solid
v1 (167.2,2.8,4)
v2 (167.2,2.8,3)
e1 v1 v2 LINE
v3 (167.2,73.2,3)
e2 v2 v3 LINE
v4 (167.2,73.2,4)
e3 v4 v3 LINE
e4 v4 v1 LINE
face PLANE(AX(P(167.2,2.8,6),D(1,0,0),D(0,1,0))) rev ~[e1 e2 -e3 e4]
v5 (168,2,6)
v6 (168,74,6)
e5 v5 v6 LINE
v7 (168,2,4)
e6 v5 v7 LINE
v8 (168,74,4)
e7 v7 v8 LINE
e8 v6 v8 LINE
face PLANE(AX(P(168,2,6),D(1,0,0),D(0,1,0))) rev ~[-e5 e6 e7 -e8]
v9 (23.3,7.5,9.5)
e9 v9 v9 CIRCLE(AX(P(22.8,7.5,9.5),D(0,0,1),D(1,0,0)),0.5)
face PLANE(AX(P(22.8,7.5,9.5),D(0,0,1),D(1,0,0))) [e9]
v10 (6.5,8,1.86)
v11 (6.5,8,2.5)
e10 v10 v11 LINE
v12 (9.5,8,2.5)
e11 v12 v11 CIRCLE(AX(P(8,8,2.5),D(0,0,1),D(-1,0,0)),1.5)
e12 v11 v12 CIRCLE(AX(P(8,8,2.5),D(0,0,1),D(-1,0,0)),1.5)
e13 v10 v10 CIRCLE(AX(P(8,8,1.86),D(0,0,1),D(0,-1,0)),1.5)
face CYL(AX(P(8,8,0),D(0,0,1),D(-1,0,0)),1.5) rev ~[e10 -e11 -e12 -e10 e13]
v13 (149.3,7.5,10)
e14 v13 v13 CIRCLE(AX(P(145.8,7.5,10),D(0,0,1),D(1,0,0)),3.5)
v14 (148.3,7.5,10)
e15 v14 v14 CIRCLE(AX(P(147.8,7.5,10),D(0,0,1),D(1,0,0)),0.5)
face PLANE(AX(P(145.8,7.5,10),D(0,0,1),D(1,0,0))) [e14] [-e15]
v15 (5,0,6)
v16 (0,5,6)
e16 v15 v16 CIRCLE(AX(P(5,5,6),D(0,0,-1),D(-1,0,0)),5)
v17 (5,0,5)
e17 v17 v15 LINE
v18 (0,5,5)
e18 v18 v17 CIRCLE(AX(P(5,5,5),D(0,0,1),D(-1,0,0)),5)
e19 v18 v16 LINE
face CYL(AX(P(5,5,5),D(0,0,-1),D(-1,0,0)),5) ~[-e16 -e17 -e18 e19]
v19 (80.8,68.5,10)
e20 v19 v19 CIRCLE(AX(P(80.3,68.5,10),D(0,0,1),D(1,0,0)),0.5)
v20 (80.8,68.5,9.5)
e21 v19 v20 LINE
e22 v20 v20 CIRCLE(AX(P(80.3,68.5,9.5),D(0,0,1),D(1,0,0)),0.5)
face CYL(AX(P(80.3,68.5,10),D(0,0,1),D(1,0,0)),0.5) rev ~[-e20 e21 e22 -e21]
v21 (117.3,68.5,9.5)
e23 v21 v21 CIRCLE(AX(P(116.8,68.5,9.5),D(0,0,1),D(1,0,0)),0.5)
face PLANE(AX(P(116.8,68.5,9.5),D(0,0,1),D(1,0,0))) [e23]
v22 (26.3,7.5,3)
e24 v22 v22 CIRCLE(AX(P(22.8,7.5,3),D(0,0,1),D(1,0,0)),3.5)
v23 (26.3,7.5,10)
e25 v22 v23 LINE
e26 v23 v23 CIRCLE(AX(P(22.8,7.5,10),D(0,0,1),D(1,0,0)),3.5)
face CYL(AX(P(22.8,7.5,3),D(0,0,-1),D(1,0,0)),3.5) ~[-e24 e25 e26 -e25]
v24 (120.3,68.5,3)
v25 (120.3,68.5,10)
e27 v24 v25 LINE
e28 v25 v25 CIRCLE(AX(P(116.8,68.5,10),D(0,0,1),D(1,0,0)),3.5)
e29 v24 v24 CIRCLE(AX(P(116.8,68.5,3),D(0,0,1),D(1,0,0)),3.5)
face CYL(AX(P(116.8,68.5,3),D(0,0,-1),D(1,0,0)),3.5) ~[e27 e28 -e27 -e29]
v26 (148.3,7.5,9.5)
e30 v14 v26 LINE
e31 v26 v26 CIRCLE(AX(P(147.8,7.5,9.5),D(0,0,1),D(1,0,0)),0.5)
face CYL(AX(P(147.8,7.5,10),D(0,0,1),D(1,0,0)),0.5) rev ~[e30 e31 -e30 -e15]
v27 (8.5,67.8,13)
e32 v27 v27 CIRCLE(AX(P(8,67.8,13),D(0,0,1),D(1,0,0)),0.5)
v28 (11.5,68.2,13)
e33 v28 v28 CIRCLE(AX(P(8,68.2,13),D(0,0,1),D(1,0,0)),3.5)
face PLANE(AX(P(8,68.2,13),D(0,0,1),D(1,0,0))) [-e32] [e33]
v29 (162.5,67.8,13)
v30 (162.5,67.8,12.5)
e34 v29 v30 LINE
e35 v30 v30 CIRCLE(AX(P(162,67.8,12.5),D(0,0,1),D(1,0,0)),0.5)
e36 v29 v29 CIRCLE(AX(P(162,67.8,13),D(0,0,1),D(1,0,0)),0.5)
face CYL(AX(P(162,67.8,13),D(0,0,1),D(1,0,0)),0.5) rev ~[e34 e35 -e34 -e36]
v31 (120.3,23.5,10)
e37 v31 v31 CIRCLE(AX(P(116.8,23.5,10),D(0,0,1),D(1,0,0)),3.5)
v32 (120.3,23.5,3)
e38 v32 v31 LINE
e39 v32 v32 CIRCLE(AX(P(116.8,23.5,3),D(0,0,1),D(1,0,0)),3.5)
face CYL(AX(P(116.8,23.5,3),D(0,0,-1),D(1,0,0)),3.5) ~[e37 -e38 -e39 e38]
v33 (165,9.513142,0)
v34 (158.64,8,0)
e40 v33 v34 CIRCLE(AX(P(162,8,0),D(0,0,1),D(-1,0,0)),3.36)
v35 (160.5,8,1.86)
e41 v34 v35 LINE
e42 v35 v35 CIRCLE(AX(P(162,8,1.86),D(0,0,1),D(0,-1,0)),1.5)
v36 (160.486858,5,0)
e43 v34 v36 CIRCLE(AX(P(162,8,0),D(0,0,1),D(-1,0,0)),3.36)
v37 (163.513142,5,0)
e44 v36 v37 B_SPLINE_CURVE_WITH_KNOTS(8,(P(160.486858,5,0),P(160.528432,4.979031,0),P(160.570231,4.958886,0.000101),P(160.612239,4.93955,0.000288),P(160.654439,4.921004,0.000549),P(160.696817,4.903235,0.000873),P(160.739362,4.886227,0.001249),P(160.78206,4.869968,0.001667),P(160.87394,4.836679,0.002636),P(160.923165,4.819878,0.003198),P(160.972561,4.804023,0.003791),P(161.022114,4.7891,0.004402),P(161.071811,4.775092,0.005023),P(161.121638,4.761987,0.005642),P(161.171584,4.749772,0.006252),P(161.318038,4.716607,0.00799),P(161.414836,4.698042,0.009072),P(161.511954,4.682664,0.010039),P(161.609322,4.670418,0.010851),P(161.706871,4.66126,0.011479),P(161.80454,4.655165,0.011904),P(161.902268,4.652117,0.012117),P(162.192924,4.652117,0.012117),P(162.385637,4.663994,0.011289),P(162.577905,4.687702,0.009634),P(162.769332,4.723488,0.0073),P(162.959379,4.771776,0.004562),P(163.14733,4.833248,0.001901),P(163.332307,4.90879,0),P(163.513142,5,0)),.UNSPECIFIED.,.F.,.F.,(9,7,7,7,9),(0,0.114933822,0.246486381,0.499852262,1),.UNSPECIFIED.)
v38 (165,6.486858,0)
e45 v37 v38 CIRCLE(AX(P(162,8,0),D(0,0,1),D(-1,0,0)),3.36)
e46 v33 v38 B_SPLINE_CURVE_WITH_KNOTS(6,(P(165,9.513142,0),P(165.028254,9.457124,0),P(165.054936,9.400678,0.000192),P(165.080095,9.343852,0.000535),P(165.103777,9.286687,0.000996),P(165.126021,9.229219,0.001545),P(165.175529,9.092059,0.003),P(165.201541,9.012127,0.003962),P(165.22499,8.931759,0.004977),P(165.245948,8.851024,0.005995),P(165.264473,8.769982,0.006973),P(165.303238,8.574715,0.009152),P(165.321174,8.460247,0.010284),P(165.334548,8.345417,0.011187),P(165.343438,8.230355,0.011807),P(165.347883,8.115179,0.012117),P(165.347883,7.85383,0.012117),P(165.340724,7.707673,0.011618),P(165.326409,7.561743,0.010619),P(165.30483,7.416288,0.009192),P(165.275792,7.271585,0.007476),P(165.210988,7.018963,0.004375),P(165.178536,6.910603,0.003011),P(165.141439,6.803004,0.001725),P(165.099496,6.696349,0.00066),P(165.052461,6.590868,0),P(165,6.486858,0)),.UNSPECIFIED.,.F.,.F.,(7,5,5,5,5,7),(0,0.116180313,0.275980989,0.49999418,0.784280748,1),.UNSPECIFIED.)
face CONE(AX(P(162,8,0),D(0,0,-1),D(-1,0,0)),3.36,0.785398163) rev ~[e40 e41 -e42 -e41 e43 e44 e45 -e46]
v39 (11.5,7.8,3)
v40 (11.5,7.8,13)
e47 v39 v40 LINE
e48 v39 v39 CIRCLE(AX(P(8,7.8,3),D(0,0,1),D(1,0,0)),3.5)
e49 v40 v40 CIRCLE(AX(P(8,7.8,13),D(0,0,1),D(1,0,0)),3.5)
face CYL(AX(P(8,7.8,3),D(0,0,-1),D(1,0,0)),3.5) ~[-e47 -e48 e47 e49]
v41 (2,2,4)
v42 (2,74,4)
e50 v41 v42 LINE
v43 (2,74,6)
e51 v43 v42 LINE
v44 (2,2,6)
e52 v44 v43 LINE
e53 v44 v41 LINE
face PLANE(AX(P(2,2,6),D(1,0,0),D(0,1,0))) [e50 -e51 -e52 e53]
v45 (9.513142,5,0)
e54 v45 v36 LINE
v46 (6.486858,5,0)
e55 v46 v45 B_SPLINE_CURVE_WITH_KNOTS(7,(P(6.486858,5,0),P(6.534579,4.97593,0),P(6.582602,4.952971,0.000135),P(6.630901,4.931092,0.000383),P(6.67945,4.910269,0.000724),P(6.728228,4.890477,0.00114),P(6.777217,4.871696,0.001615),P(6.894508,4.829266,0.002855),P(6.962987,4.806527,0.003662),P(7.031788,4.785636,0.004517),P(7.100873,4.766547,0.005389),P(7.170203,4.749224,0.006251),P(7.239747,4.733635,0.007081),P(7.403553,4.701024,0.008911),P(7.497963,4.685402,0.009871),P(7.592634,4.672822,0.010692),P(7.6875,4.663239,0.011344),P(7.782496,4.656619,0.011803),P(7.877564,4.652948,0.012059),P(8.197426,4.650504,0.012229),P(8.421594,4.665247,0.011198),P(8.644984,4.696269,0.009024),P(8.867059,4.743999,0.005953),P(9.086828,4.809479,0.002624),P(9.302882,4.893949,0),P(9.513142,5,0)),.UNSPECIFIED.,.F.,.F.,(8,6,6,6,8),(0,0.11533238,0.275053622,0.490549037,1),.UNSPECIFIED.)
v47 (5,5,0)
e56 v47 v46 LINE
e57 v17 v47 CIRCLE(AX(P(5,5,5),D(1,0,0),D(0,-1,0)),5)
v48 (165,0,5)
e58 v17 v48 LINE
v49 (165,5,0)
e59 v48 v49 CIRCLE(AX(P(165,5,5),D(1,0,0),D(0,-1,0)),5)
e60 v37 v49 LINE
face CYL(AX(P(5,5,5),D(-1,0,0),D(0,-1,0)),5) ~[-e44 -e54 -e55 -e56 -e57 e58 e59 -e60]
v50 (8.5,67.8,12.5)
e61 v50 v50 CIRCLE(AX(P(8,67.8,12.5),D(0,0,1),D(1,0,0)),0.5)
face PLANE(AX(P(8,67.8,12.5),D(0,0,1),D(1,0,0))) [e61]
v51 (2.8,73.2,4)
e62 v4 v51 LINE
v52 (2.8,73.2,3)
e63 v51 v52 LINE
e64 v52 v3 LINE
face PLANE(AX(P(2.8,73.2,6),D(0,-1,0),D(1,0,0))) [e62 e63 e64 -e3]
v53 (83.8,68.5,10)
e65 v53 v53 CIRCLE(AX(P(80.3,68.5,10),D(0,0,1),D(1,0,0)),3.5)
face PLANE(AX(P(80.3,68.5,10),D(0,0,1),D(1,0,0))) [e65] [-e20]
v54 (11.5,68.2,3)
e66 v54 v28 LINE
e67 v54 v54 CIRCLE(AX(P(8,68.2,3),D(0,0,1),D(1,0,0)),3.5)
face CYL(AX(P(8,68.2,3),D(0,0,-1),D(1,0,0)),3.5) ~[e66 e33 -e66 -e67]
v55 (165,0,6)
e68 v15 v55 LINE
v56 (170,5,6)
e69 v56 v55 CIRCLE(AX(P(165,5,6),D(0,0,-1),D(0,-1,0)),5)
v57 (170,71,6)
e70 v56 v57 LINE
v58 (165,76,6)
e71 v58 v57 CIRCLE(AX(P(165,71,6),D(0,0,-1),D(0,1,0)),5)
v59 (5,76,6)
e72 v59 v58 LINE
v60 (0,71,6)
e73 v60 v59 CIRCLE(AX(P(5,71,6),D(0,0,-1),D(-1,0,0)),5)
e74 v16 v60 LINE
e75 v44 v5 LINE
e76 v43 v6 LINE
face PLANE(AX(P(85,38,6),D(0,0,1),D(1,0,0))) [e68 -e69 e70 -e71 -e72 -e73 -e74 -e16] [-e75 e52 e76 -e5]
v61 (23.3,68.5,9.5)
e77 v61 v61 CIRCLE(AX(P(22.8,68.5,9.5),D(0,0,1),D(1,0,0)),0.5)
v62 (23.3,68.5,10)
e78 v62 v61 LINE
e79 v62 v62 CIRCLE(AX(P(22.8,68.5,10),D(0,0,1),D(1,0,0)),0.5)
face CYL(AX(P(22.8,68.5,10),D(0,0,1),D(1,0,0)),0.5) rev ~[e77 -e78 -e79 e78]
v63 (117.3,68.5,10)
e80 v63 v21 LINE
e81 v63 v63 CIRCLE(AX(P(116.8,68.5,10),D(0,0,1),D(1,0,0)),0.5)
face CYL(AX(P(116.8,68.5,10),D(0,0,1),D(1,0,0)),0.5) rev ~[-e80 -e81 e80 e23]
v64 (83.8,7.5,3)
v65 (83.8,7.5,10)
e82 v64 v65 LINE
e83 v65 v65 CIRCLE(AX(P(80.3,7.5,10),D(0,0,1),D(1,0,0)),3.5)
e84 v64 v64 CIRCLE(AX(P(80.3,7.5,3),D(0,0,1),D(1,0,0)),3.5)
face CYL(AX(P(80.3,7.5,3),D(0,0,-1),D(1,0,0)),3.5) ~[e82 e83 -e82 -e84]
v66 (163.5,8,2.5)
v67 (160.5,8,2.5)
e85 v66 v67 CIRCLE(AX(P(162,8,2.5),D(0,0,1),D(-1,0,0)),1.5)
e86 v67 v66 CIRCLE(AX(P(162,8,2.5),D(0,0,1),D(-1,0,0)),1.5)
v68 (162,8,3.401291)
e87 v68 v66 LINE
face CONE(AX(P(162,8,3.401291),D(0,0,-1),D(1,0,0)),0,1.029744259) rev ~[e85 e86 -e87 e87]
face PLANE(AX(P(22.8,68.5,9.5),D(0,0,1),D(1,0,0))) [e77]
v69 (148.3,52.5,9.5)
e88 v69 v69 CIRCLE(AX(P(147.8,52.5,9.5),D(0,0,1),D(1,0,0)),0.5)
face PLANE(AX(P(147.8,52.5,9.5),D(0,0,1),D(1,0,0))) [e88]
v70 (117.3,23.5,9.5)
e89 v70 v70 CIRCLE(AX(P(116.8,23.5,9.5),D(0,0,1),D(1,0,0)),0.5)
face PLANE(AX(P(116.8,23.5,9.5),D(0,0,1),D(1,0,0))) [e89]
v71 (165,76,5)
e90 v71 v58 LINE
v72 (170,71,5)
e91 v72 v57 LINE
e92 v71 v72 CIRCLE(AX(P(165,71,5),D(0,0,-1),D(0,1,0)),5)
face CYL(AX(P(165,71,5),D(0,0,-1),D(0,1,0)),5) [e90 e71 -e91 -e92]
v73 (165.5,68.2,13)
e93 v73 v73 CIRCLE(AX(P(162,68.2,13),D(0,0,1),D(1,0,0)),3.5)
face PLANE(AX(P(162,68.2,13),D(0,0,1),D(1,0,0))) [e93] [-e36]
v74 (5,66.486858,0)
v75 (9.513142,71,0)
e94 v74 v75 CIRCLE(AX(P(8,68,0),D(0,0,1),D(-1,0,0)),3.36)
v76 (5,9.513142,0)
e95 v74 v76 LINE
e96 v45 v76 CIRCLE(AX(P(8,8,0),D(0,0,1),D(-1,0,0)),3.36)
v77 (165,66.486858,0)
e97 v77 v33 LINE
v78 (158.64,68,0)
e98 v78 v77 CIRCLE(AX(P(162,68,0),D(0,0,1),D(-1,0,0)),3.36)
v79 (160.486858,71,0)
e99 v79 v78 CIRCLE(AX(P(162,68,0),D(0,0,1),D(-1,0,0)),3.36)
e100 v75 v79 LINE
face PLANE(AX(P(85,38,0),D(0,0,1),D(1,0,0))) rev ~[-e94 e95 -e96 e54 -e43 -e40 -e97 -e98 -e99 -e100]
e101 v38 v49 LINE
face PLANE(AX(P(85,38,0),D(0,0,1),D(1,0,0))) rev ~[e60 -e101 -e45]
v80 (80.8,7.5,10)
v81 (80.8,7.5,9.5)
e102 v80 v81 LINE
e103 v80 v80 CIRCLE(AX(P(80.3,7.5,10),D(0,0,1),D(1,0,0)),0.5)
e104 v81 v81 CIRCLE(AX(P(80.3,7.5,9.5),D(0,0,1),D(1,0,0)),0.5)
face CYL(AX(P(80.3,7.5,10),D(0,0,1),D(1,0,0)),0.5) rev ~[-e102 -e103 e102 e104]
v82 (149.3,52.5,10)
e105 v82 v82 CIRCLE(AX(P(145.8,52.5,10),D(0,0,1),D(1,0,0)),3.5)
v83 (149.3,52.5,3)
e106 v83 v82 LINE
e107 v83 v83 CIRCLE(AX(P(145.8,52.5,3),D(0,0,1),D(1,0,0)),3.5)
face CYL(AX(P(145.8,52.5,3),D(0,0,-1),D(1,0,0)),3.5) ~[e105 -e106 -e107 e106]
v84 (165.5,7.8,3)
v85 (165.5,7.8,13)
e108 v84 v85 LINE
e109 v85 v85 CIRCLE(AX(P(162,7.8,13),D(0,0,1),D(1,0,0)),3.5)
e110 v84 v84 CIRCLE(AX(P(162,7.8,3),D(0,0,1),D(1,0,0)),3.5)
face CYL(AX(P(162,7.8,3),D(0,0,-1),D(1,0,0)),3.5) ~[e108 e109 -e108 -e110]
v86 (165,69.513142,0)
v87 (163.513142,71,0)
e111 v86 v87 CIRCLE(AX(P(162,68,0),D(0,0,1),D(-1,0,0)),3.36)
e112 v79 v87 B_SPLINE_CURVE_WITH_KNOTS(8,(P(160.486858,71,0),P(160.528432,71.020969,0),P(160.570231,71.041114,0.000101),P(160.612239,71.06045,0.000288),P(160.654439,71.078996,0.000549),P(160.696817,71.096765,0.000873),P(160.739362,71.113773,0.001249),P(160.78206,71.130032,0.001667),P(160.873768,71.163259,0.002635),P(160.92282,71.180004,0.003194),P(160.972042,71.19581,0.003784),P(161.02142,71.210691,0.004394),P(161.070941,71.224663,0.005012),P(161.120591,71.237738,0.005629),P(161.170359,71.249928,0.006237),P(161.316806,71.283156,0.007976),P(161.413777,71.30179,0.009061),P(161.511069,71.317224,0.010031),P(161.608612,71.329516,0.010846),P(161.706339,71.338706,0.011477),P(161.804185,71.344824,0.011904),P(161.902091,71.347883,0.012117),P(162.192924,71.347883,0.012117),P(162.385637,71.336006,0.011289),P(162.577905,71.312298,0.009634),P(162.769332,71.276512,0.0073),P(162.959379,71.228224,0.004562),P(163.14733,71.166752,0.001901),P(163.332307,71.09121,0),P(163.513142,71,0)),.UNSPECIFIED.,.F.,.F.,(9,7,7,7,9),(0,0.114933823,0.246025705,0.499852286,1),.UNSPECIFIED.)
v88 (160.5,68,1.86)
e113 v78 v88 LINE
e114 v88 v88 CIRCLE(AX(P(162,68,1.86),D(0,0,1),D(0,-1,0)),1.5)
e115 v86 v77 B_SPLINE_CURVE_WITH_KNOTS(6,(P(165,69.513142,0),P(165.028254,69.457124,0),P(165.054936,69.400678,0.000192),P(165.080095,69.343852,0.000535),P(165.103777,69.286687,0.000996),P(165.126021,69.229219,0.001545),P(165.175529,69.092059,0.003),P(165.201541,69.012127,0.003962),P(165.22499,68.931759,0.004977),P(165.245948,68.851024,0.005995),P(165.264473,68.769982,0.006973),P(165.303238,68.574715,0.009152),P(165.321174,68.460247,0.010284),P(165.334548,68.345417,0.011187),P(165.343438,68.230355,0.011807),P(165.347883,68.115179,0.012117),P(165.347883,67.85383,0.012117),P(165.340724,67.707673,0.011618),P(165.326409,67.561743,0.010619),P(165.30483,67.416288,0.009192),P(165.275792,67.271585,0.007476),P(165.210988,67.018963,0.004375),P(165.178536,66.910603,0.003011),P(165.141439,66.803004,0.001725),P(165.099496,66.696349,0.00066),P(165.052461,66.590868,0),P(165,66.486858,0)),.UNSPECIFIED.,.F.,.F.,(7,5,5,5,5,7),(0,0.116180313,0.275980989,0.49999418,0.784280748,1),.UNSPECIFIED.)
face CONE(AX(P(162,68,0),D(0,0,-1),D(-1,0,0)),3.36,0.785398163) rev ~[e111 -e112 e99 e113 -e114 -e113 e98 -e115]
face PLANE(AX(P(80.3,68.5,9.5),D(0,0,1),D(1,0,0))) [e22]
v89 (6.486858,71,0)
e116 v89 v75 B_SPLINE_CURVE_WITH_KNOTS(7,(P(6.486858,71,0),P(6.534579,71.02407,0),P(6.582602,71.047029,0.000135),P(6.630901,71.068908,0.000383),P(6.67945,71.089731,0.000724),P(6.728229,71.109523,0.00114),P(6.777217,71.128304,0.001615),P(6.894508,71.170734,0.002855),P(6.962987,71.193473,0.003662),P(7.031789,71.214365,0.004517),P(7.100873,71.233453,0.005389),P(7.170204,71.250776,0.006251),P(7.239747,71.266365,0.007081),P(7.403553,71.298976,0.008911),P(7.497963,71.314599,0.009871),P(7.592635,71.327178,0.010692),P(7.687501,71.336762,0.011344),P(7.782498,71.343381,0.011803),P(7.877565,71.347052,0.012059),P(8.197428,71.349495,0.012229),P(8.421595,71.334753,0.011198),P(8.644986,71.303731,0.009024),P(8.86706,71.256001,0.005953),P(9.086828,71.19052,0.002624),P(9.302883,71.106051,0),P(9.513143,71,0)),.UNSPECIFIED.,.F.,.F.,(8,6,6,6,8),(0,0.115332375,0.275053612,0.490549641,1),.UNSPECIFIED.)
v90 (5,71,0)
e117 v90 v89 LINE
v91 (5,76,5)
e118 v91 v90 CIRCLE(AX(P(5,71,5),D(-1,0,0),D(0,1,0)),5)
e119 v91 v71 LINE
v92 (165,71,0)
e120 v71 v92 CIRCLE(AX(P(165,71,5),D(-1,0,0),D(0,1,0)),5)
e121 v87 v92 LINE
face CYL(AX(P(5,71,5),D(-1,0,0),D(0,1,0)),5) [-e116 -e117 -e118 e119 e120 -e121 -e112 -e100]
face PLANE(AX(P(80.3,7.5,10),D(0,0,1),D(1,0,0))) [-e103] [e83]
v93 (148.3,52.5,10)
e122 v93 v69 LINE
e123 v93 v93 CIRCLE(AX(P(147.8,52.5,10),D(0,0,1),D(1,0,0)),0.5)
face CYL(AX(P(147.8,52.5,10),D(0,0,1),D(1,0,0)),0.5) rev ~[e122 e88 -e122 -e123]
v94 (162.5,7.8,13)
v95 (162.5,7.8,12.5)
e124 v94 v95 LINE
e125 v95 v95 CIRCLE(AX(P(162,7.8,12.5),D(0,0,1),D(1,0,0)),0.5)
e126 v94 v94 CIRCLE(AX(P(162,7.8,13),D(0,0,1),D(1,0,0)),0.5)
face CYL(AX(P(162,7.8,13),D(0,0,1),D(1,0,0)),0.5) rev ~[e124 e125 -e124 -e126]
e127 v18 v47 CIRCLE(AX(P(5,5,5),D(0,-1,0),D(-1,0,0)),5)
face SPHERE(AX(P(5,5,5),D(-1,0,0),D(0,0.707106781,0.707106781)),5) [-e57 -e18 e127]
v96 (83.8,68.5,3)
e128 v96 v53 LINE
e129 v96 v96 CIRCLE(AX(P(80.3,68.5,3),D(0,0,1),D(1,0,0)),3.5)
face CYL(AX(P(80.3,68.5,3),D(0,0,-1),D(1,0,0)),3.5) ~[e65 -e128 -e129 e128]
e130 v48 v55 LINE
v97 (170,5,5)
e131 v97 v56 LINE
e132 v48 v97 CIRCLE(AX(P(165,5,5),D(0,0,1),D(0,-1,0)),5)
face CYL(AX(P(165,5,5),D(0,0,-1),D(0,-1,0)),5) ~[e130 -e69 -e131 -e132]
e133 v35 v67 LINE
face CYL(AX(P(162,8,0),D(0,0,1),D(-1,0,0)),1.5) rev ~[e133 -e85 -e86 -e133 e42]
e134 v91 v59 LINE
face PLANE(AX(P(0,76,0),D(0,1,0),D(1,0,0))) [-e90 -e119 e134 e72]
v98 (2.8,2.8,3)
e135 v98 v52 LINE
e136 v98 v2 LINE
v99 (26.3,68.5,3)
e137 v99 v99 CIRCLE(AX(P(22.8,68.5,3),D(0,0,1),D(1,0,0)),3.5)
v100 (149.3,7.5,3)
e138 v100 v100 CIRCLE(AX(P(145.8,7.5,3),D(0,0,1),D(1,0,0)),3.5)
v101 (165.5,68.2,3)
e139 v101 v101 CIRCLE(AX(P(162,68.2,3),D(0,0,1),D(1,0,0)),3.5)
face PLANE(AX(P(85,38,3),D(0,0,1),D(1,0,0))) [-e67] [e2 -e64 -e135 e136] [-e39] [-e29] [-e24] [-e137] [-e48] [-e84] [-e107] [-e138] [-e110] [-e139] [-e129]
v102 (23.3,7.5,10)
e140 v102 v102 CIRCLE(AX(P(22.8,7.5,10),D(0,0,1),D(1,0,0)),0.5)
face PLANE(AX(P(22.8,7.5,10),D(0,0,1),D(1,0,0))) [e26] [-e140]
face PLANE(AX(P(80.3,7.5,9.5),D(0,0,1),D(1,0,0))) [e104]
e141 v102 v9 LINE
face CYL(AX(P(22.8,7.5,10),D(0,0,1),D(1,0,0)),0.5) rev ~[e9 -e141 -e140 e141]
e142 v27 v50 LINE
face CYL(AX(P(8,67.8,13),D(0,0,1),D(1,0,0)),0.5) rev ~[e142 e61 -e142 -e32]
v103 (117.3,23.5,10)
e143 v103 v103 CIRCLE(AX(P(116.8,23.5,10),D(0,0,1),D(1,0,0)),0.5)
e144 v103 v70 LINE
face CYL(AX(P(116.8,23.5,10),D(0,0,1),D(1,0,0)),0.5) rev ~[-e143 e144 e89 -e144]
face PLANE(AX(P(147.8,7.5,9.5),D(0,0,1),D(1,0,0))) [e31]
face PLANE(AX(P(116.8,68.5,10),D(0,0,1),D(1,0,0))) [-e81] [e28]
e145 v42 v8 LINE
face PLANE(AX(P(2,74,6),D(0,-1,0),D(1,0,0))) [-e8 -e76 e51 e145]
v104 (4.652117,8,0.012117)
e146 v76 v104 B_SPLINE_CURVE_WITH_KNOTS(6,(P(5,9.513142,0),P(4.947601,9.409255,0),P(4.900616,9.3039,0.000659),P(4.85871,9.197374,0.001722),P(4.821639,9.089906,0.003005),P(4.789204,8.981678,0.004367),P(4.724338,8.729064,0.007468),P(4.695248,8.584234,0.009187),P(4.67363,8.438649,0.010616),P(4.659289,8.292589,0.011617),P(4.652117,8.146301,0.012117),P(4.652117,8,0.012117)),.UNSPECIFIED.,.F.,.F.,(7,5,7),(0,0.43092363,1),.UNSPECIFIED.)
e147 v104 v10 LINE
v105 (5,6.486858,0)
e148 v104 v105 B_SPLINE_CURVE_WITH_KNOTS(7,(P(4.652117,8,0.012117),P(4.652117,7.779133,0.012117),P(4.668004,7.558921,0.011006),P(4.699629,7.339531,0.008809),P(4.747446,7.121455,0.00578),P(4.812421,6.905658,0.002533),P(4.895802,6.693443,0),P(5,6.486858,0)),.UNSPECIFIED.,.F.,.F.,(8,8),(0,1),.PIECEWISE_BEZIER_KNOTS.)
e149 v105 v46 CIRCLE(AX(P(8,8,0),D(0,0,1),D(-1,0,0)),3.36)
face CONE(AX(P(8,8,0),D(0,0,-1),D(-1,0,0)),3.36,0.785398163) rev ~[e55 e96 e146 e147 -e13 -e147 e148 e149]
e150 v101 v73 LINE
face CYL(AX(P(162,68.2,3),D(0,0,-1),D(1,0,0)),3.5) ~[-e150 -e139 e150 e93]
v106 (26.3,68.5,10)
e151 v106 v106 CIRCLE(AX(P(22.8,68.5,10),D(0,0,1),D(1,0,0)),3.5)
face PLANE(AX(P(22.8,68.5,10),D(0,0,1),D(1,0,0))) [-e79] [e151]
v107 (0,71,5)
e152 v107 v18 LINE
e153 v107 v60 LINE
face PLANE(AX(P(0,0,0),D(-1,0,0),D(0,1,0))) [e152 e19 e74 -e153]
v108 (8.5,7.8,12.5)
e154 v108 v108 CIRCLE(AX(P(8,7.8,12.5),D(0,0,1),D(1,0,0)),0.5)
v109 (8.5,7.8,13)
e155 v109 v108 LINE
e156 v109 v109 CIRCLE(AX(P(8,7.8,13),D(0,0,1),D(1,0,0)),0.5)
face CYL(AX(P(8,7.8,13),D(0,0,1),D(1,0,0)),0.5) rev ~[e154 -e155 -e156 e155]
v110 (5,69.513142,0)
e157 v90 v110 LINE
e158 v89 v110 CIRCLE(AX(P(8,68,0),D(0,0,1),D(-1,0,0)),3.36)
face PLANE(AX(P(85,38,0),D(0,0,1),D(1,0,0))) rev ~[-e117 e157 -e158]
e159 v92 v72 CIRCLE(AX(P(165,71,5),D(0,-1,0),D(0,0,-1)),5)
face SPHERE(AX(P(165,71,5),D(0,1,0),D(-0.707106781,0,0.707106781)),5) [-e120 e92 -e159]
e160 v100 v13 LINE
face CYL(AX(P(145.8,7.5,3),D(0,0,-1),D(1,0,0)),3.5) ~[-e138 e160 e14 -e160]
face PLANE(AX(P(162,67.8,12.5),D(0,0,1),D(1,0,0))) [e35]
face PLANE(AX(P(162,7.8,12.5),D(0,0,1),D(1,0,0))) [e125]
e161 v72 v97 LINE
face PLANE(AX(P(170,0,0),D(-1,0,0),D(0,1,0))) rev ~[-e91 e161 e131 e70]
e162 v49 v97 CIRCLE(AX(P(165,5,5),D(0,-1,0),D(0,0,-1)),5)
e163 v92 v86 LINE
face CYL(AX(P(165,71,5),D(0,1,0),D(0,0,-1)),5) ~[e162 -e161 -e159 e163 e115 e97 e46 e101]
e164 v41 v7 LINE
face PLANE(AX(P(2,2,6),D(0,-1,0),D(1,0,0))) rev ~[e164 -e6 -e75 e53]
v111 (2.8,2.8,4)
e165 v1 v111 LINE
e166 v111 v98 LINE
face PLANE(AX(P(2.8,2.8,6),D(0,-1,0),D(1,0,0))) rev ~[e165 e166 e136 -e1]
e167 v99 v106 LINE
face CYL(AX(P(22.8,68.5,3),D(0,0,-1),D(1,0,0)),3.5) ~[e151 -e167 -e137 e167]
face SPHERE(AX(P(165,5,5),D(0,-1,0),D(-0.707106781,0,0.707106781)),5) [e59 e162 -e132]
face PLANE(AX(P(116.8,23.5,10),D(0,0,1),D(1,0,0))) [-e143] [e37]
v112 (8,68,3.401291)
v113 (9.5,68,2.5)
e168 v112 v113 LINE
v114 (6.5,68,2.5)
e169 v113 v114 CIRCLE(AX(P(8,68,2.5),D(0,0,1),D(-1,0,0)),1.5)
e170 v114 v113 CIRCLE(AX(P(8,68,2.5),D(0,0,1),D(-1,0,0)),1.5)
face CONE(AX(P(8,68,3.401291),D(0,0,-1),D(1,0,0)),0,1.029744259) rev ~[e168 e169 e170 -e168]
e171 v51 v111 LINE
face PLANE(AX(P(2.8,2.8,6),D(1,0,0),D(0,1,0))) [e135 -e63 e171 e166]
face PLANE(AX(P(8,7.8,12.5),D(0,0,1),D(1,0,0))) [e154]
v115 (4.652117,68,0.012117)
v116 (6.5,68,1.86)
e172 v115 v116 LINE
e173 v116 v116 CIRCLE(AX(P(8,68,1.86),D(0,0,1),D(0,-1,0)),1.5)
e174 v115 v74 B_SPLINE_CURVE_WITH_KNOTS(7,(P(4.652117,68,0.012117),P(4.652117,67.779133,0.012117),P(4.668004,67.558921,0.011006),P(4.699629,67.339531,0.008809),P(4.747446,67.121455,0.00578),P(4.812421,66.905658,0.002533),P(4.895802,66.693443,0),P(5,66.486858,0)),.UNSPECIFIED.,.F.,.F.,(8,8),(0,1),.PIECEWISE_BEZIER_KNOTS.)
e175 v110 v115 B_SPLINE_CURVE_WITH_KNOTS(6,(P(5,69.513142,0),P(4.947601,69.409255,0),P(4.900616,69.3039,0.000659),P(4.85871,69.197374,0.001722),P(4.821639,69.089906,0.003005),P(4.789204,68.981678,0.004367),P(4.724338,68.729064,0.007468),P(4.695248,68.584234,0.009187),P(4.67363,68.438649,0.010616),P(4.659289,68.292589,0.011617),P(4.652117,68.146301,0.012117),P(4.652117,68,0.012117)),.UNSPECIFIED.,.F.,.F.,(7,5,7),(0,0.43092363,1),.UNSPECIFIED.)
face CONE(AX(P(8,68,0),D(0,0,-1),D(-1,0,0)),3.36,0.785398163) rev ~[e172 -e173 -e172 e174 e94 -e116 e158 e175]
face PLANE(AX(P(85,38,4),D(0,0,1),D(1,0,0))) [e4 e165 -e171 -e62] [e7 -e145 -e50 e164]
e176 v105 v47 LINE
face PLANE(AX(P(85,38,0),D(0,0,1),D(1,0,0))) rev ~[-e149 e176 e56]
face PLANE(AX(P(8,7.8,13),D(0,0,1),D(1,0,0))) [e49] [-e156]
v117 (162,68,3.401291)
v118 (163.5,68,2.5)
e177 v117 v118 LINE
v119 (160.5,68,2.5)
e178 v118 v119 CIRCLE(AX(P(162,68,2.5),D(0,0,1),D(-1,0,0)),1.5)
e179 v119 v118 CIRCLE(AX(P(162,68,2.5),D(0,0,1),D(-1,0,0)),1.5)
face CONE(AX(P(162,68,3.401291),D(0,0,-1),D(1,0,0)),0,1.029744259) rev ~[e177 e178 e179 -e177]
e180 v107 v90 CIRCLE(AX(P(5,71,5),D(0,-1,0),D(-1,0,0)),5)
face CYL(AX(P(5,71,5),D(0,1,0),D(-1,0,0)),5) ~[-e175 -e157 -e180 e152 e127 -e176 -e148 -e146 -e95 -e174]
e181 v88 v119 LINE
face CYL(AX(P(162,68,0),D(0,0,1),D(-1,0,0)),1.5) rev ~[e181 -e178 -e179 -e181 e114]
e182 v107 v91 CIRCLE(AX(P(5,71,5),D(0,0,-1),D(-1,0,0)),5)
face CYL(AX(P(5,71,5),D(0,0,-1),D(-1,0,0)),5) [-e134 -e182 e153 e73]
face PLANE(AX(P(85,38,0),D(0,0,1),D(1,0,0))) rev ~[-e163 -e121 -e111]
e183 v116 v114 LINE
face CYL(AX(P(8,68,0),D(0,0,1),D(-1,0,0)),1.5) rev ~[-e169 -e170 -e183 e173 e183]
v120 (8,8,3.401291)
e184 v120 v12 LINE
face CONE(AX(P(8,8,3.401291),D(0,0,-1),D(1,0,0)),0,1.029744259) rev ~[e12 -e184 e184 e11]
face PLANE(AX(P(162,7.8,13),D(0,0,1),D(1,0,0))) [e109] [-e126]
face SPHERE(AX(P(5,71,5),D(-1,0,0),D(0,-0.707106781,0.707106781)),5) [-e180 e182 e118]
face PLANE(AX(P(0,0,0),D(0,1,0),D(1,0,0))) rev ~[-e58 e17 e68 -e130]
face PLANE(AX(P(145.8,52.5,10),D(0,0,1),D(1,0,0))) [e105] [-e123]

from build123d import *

# Parameters (mm, degrees)
F0_W            = 170
F0_H            = 76
F1_DEPTH        = 6
F2_W            = 164.4
F2_H            = 70.4
F3_DEPTH        = 3
F4_R            = 3.5
F5_DEPTH        = 7
F6_R            = 4
F7_DEPTH        = 2.8
F8_W            = 166
F8_H            = 72
F8_W_2          = 163.2
F8_H_2          = 69.2
F9_DEPTH        = 2
F10_R           = 3.5
F11_DEPTH       = 10
F12_R           = 0.5
F13_DEPTH       = 0.5
F14_R           = 0.5
F15_DEPTH       = 0.5
F17_D           = 3
F17_DEPTH       = 2.5
F17_CSINK_D     = 6.72
F17_CSINK_ANGLE = 90
F17_TIP         = 0.9012909285
F18_T1_DEPTH    = 13.5
F18_T3_DEPTH    = 66
F18_T5_DEPTH    = 160
F18_S9_W        = 5
F18_S9_H        = 5
F18_T10_DEPTH   = 5
F18_S15_W       = 5
F18_S15_H       = 5
F18_T16_DEPTH   = 5
F18_S21_W       = 5
F18_S21_H       = 5
F18_T22_DEPTH   = 5
F18_S27_W       = 5
F18_S27_H       = 5
F18_T28_DEPTH   = 5


# Not quite as in the source:
# - a fillet or chamfer that OpenCascade refuses, or shapes differently, is made with other operations: its cross-section is extruded or revolved along the edge and cut away or added


with BuildPart() as f1:
    # F0 (on Top) → F1 (new body)
    with BuildSketch(Plane.XY):
        with Locations((85, 38)):
            Rectangle(F0_W, F0_H)
    extrude(amount=F1_DEPTH)

    # F2 (on face) → F3 (cut)
    with BuildSketch(Plane.XY.offset(6)):
        with Locations((85, 38)):
            Rectangle(F2_W, F2_H)
    extrude(amount=-F3_DEPTH, mode=Mode.SUBTRACT)

    # F4 (on face) → F5 (join)
    with BuildSketch(Plane.XY.offset(3)):
        with Locations((22.8, 68.5)):
            Circle(F4_R)
        with Locations((22.8, 7.5)):
            Circle(F4_R)
        with Locations((80.3, 68.5)):
            Circle(F4_R)
        with Locations((80.3, 7.5)):
            Circle(F4_R)
        with Locations((116.8, 68.5)):
            Circle(F4_R)
        with Locations((145.8, 52.5)):
            Circle(F4_R)
        with Locations((116.8, 23.5)):
            Circle(F4_R)
        with Locations((145.8, 7.5)):
            Circle(F4_R)
    extrude(amount=F5_DEPTH)

    # F6 (on face) → F7 (cut, through all)
    with BuildSketch(Plane(origin=(0, 0, 0), x_dir=(0, -1, 0), z_dir=(-1, 0, 0))):
        with Locations((-57, 18)):
            Circle(F6_R)
        with Locations((-19, 18)):
            Circle(F6_R)
    extrude(amount=-F7_DEPTH, mode=Mode.SUBTRACT)

    # F8 (on face) → F9 (cut)
    with BuildSketch(Plane.XY.offset(6)):
        with Locations((85, 38)):
            Rectangle(F8_W, F8_H)
        with Locations((84.6, 37.6)):
            Rectangle(F8_W_2, F8_H_2, mode=Mode.SUBTRACT)
    extrude(amount=-F9_DEPTH, mode=Mode.SUBTRACT)

    # F10 (on face) → F11 (join)
    with BuildSketch(Plane.XY.offset(3)):
        with Locations((8, 68.2)):
            Circle(F10_R)
        with Locations((8, 7.8)):
            Circle(F10_R)
        with Locations((162, 7.8)):
            Circle(F10_R)
        with Locations((162, 68.2)):
            Circle(F10_R)
    extrude(amount=F11_DEPTH)

    # F12 (on face) → F13 (cut)
    with BuildSketch(Plane.XY.offset(13)):
        with Locations((8, 67.8)):
            Circle(F12_R)
        with Locations((8, 7.8)):
            Circle(F12_R)
        with Locations((162, 7.8)):
            Circle(F12_R)
        with Locations((162, 67.8)):
            Circle(F12_R)
    extrude(amount=-F13_DEPTH, mode=Mode.SUBTRACT)

    # F14 (on face) → F15 (cut)
    with BuildSketch(Plane.XY.offset(10)):
        with Locations((22.8, 68.5)):
            Circle(F14_R)
        with Locations((22.8, 7.5)):
            Circle(F14_R)
        with Locations((80.3, 68.5)):
            Circle(F14_R)
        with Locations((80.3, 7.5)):
            Circle(F14_R)
        with Locations((116.8, 68.5)):
            Circle(F14_R)
        with Locations((147.8, 52.5)):
            Circle(F14_R)
        with Locations((116.8, 23.5)):
            Circle(F14_R)
        with Locations((147.8, 7.5)):
            Circle(F14_R)
    extrude(amount=-F15_DEPTH, mode=Mode.SUBTRACT)

    # F17
    with Locations(Plane(origin=(0, 0, 0), x_dir=(1, 0, 0), z_dir=(0, 0, -1))):
        with Locations((8, -8), (8, -68), (162, -68), (162, -8)):
            CounterSinkHole(F17_D / 2, F17_CSINK_D / 2, depth=F17_DEPTH, counter_sink_angle=F17_CSINK_ANGLE)
            with Locations((0, 0, -(F17_DEPTH + F17_TIP / 2))):  # 118° drill point
                Cone(0, F17_D / 2, F17_TIP, mode=Mode.SUBTRACT)

    # F18: fillet of radius 5 on 8 edges, made by hand

    # F18_s2 → F18_t1 (cut)
    with BuildSketch(Plane.XY.offset(5)):
        with BuildLine():
            ThreePointArc((165, 76), (168.5355339059, 74.5355339059), (170, 71))
            Line((170, 71), (170, 76))
            Line((170, 76), (165, 76))
        make_face()
        with BuildLine():
            ThreePointArc((165, 0), (168.5355339059, 1.4644660941), (170, 5))
            Line((170, 5), (170, 0))
            Line((170, 0), (165, 0))
        make_face()
        with BuildLine():
            ThreePointArc((0, 71), (1.4644660941, 74.5355339059), (5, 76))
            Line((5, 76), (0, 76))
            Line((0, 76), (0, 71))
        make_face()
        with BuildLine():
            ThreePointArc((0, 5), (1.4644660941, 1.4644660941), (5, 0))
            Line((5, 0), (0, 0))
            Line((0, 0), (0, 5))
        make_face()
    extrude(amount=F18_T1_DEPTH, mode=Mode.SUBTRACT)

    # F18_s4 → F18_t3 (cut)
    with BuildSketch(Plane.XZ.offset(-71)):
        with BuildLine():
            ThreePointArc((165, 0), (168.5355339059, 1.4644660941), (170, 5))
            Line((170, 5), (170, 0))
            Line((170, 0), (165, 0))
        make_face()
        with BuildLine():
            ThreePointArc((0, 5), (1.4644660941, 1.4644660941), (5, 0))
            Line((5, 0), (0, 0))
            Line((0, 0), (0, 5))
        make_face()
    extrude(amount=F18_T3_DEPTH, mode=Mode.SUBTRACT)

    # F18_s6 → F18_t5 (cut)
    with BuildSketch(Plane.YZ.offset(5)):
        with BuildLine():
            ThreePointArc((76, 5), (74.5355339059, 1.4644660941), (71, 0))
            Line((71, 0), (76, 0))
            Line((76, 0), (76, 5))
        make_face()
        with BuildLine():
            ThreePointArc((0, 5), (1.4644660941, 1.4644660941), (5, 0))
            Line((5, 0), (0, 0))
            Line((0, 0), (0, 5))
        make_face()
    extrude(amount=F18_T5_DEPTH, mode=Mode.SUBTRACT)


with BuildPart() as f18_tool8:
    # F18_s9 → F18_t10 (new body)
    with BuildSketch(Plane.XZ.offset(-71)):
        with Locations((167.5, 2.5)):
            Rectangle(F18_S9_W, F18_S9_H)
    extrude(amount=-F18_T10_DEPTH)

    # F18_s11 → F18_t12 (revolve, cut)
    with BuildSketch(Plane(origin=(165, 71, 5), x_dir=(-0.7071067812, 0, 0.7071067812), z_dir=(-0.7071067812, 0, -0.7071067812))):
        with BuildLine():
            ThreePointArc((0, -5), (5, 0), (0, 5))
            Line((0, 5), (0, -5))
        make_face()
    revolve(axis=Axis((165, 71, 5), (0, 1, 0)), mode=Mode.SUBTRACT)


with BuildPart() as f1_1:
    add(f1.part)

    # F18_t7: cut F18_tool8
    add(f18_tool8.part, mode=Mode.SUBTRACT)


with BuildPart() as f18_tool14:
    # F18_s15 → F18_t16 (new body)
    with BuildSketch(Plane.XZ.offset(-5)):
        with Locations((167.5, 2.5)):
            Rectangle(F18_S15_W, F18_S15_H)
    extrude(amount=F18_T16_DEPTH)

    # F18_s17 → F18_t18 (revolve, cut)
    with BuildSketch(Plane(origin=(165, 5, 5), x_dir=(-0.7071067812, 0, 0.7071067812), z_dir=(0.7071067812, 0, 0.7071067812))):
        with BuildLine():
            ThreePointArc((0, -5), (5, 0), (0, 5))
            Line((0, 5), (0, -5))
        make_face()
    revolve(axis=Axis((165, 5, 5), (0, -1, 0)), mode=Mode.SUBTRACT)


with BuildPart() as f1_2:
    add(f1_1.part)

    # F18_t13: cut F18_tool14
    add(f18_tool14.part, mode=Mode.SUBTRACT)


with BuildPart() as f18_tool20:
    # F18_s21 → F18_t22 (new body)
    with BuildSketch(Plane.YZ.offset(5)):
        with Locations((73.5, 2.5)):
            Rectangle(F18_S21_W, F18_S21_H)
    extrude(amount=-F18_T22_DEPTH)

    # F18_s23 → F18_t24 (revolve, cut)
    with BuildSketch(Plane(origin=(5, 71, 5), x_dir=(0, -0.7071067812, 0.7071067812), z_dir=(0, -0.7071067812, -0.7071067812))):
        with BuildLine():
            ThreePointArc((0, -5), (5, 0), (0, 5))
            Line((0, 5), (0, -5))
        make_face()
    revolve(axis=Axis((5, 71, 5), (-1, 0, 0)), mode=Mode.SUBTRACT)


with BuildPart() as f1_3:
    add(f1_2.part)

    # F18_t19: cut F18_tool20
    add(f18_tool20.part, mode=Mode.SUBTRACT)


with BuildPart() as f18_tool26:
    # F18_s27 → F18_t28 (new body)
    with BuildSketch(Plane.YZ.offset(5)):
        with Locations((2.5, 2.5)):
            Rectangle(F18_S27_W, F18_S27_H)
    extrude(amount=-F18_T28_DEPTH)

    # F18_s29 → F18_t30 (revolve, cut)
    with BuildSketch(Plane(origin=(5, 5, 5), x_dir=(0, 0.7071067812, 0.7071067812), z_dir=(0, -0.7071067812, 0.7071067812))):
        with BuildLine():
            ThreePointArc((0, -5), (5, 0), (0, 5))
            Line((0, 5), (0, -5))
        make_face()
    revolve(axis=Axis((5, 5, 5), (-1, 0, 0)), mode=Mode.SUBTRACT)


with BuildPart() as f1_4:
    add(f1_3.part)

    # F18_t25: cut F18_tool26
    add(f18_tool26.part, mode=Mode.SUBTRACT)


solid = f1_4.part
